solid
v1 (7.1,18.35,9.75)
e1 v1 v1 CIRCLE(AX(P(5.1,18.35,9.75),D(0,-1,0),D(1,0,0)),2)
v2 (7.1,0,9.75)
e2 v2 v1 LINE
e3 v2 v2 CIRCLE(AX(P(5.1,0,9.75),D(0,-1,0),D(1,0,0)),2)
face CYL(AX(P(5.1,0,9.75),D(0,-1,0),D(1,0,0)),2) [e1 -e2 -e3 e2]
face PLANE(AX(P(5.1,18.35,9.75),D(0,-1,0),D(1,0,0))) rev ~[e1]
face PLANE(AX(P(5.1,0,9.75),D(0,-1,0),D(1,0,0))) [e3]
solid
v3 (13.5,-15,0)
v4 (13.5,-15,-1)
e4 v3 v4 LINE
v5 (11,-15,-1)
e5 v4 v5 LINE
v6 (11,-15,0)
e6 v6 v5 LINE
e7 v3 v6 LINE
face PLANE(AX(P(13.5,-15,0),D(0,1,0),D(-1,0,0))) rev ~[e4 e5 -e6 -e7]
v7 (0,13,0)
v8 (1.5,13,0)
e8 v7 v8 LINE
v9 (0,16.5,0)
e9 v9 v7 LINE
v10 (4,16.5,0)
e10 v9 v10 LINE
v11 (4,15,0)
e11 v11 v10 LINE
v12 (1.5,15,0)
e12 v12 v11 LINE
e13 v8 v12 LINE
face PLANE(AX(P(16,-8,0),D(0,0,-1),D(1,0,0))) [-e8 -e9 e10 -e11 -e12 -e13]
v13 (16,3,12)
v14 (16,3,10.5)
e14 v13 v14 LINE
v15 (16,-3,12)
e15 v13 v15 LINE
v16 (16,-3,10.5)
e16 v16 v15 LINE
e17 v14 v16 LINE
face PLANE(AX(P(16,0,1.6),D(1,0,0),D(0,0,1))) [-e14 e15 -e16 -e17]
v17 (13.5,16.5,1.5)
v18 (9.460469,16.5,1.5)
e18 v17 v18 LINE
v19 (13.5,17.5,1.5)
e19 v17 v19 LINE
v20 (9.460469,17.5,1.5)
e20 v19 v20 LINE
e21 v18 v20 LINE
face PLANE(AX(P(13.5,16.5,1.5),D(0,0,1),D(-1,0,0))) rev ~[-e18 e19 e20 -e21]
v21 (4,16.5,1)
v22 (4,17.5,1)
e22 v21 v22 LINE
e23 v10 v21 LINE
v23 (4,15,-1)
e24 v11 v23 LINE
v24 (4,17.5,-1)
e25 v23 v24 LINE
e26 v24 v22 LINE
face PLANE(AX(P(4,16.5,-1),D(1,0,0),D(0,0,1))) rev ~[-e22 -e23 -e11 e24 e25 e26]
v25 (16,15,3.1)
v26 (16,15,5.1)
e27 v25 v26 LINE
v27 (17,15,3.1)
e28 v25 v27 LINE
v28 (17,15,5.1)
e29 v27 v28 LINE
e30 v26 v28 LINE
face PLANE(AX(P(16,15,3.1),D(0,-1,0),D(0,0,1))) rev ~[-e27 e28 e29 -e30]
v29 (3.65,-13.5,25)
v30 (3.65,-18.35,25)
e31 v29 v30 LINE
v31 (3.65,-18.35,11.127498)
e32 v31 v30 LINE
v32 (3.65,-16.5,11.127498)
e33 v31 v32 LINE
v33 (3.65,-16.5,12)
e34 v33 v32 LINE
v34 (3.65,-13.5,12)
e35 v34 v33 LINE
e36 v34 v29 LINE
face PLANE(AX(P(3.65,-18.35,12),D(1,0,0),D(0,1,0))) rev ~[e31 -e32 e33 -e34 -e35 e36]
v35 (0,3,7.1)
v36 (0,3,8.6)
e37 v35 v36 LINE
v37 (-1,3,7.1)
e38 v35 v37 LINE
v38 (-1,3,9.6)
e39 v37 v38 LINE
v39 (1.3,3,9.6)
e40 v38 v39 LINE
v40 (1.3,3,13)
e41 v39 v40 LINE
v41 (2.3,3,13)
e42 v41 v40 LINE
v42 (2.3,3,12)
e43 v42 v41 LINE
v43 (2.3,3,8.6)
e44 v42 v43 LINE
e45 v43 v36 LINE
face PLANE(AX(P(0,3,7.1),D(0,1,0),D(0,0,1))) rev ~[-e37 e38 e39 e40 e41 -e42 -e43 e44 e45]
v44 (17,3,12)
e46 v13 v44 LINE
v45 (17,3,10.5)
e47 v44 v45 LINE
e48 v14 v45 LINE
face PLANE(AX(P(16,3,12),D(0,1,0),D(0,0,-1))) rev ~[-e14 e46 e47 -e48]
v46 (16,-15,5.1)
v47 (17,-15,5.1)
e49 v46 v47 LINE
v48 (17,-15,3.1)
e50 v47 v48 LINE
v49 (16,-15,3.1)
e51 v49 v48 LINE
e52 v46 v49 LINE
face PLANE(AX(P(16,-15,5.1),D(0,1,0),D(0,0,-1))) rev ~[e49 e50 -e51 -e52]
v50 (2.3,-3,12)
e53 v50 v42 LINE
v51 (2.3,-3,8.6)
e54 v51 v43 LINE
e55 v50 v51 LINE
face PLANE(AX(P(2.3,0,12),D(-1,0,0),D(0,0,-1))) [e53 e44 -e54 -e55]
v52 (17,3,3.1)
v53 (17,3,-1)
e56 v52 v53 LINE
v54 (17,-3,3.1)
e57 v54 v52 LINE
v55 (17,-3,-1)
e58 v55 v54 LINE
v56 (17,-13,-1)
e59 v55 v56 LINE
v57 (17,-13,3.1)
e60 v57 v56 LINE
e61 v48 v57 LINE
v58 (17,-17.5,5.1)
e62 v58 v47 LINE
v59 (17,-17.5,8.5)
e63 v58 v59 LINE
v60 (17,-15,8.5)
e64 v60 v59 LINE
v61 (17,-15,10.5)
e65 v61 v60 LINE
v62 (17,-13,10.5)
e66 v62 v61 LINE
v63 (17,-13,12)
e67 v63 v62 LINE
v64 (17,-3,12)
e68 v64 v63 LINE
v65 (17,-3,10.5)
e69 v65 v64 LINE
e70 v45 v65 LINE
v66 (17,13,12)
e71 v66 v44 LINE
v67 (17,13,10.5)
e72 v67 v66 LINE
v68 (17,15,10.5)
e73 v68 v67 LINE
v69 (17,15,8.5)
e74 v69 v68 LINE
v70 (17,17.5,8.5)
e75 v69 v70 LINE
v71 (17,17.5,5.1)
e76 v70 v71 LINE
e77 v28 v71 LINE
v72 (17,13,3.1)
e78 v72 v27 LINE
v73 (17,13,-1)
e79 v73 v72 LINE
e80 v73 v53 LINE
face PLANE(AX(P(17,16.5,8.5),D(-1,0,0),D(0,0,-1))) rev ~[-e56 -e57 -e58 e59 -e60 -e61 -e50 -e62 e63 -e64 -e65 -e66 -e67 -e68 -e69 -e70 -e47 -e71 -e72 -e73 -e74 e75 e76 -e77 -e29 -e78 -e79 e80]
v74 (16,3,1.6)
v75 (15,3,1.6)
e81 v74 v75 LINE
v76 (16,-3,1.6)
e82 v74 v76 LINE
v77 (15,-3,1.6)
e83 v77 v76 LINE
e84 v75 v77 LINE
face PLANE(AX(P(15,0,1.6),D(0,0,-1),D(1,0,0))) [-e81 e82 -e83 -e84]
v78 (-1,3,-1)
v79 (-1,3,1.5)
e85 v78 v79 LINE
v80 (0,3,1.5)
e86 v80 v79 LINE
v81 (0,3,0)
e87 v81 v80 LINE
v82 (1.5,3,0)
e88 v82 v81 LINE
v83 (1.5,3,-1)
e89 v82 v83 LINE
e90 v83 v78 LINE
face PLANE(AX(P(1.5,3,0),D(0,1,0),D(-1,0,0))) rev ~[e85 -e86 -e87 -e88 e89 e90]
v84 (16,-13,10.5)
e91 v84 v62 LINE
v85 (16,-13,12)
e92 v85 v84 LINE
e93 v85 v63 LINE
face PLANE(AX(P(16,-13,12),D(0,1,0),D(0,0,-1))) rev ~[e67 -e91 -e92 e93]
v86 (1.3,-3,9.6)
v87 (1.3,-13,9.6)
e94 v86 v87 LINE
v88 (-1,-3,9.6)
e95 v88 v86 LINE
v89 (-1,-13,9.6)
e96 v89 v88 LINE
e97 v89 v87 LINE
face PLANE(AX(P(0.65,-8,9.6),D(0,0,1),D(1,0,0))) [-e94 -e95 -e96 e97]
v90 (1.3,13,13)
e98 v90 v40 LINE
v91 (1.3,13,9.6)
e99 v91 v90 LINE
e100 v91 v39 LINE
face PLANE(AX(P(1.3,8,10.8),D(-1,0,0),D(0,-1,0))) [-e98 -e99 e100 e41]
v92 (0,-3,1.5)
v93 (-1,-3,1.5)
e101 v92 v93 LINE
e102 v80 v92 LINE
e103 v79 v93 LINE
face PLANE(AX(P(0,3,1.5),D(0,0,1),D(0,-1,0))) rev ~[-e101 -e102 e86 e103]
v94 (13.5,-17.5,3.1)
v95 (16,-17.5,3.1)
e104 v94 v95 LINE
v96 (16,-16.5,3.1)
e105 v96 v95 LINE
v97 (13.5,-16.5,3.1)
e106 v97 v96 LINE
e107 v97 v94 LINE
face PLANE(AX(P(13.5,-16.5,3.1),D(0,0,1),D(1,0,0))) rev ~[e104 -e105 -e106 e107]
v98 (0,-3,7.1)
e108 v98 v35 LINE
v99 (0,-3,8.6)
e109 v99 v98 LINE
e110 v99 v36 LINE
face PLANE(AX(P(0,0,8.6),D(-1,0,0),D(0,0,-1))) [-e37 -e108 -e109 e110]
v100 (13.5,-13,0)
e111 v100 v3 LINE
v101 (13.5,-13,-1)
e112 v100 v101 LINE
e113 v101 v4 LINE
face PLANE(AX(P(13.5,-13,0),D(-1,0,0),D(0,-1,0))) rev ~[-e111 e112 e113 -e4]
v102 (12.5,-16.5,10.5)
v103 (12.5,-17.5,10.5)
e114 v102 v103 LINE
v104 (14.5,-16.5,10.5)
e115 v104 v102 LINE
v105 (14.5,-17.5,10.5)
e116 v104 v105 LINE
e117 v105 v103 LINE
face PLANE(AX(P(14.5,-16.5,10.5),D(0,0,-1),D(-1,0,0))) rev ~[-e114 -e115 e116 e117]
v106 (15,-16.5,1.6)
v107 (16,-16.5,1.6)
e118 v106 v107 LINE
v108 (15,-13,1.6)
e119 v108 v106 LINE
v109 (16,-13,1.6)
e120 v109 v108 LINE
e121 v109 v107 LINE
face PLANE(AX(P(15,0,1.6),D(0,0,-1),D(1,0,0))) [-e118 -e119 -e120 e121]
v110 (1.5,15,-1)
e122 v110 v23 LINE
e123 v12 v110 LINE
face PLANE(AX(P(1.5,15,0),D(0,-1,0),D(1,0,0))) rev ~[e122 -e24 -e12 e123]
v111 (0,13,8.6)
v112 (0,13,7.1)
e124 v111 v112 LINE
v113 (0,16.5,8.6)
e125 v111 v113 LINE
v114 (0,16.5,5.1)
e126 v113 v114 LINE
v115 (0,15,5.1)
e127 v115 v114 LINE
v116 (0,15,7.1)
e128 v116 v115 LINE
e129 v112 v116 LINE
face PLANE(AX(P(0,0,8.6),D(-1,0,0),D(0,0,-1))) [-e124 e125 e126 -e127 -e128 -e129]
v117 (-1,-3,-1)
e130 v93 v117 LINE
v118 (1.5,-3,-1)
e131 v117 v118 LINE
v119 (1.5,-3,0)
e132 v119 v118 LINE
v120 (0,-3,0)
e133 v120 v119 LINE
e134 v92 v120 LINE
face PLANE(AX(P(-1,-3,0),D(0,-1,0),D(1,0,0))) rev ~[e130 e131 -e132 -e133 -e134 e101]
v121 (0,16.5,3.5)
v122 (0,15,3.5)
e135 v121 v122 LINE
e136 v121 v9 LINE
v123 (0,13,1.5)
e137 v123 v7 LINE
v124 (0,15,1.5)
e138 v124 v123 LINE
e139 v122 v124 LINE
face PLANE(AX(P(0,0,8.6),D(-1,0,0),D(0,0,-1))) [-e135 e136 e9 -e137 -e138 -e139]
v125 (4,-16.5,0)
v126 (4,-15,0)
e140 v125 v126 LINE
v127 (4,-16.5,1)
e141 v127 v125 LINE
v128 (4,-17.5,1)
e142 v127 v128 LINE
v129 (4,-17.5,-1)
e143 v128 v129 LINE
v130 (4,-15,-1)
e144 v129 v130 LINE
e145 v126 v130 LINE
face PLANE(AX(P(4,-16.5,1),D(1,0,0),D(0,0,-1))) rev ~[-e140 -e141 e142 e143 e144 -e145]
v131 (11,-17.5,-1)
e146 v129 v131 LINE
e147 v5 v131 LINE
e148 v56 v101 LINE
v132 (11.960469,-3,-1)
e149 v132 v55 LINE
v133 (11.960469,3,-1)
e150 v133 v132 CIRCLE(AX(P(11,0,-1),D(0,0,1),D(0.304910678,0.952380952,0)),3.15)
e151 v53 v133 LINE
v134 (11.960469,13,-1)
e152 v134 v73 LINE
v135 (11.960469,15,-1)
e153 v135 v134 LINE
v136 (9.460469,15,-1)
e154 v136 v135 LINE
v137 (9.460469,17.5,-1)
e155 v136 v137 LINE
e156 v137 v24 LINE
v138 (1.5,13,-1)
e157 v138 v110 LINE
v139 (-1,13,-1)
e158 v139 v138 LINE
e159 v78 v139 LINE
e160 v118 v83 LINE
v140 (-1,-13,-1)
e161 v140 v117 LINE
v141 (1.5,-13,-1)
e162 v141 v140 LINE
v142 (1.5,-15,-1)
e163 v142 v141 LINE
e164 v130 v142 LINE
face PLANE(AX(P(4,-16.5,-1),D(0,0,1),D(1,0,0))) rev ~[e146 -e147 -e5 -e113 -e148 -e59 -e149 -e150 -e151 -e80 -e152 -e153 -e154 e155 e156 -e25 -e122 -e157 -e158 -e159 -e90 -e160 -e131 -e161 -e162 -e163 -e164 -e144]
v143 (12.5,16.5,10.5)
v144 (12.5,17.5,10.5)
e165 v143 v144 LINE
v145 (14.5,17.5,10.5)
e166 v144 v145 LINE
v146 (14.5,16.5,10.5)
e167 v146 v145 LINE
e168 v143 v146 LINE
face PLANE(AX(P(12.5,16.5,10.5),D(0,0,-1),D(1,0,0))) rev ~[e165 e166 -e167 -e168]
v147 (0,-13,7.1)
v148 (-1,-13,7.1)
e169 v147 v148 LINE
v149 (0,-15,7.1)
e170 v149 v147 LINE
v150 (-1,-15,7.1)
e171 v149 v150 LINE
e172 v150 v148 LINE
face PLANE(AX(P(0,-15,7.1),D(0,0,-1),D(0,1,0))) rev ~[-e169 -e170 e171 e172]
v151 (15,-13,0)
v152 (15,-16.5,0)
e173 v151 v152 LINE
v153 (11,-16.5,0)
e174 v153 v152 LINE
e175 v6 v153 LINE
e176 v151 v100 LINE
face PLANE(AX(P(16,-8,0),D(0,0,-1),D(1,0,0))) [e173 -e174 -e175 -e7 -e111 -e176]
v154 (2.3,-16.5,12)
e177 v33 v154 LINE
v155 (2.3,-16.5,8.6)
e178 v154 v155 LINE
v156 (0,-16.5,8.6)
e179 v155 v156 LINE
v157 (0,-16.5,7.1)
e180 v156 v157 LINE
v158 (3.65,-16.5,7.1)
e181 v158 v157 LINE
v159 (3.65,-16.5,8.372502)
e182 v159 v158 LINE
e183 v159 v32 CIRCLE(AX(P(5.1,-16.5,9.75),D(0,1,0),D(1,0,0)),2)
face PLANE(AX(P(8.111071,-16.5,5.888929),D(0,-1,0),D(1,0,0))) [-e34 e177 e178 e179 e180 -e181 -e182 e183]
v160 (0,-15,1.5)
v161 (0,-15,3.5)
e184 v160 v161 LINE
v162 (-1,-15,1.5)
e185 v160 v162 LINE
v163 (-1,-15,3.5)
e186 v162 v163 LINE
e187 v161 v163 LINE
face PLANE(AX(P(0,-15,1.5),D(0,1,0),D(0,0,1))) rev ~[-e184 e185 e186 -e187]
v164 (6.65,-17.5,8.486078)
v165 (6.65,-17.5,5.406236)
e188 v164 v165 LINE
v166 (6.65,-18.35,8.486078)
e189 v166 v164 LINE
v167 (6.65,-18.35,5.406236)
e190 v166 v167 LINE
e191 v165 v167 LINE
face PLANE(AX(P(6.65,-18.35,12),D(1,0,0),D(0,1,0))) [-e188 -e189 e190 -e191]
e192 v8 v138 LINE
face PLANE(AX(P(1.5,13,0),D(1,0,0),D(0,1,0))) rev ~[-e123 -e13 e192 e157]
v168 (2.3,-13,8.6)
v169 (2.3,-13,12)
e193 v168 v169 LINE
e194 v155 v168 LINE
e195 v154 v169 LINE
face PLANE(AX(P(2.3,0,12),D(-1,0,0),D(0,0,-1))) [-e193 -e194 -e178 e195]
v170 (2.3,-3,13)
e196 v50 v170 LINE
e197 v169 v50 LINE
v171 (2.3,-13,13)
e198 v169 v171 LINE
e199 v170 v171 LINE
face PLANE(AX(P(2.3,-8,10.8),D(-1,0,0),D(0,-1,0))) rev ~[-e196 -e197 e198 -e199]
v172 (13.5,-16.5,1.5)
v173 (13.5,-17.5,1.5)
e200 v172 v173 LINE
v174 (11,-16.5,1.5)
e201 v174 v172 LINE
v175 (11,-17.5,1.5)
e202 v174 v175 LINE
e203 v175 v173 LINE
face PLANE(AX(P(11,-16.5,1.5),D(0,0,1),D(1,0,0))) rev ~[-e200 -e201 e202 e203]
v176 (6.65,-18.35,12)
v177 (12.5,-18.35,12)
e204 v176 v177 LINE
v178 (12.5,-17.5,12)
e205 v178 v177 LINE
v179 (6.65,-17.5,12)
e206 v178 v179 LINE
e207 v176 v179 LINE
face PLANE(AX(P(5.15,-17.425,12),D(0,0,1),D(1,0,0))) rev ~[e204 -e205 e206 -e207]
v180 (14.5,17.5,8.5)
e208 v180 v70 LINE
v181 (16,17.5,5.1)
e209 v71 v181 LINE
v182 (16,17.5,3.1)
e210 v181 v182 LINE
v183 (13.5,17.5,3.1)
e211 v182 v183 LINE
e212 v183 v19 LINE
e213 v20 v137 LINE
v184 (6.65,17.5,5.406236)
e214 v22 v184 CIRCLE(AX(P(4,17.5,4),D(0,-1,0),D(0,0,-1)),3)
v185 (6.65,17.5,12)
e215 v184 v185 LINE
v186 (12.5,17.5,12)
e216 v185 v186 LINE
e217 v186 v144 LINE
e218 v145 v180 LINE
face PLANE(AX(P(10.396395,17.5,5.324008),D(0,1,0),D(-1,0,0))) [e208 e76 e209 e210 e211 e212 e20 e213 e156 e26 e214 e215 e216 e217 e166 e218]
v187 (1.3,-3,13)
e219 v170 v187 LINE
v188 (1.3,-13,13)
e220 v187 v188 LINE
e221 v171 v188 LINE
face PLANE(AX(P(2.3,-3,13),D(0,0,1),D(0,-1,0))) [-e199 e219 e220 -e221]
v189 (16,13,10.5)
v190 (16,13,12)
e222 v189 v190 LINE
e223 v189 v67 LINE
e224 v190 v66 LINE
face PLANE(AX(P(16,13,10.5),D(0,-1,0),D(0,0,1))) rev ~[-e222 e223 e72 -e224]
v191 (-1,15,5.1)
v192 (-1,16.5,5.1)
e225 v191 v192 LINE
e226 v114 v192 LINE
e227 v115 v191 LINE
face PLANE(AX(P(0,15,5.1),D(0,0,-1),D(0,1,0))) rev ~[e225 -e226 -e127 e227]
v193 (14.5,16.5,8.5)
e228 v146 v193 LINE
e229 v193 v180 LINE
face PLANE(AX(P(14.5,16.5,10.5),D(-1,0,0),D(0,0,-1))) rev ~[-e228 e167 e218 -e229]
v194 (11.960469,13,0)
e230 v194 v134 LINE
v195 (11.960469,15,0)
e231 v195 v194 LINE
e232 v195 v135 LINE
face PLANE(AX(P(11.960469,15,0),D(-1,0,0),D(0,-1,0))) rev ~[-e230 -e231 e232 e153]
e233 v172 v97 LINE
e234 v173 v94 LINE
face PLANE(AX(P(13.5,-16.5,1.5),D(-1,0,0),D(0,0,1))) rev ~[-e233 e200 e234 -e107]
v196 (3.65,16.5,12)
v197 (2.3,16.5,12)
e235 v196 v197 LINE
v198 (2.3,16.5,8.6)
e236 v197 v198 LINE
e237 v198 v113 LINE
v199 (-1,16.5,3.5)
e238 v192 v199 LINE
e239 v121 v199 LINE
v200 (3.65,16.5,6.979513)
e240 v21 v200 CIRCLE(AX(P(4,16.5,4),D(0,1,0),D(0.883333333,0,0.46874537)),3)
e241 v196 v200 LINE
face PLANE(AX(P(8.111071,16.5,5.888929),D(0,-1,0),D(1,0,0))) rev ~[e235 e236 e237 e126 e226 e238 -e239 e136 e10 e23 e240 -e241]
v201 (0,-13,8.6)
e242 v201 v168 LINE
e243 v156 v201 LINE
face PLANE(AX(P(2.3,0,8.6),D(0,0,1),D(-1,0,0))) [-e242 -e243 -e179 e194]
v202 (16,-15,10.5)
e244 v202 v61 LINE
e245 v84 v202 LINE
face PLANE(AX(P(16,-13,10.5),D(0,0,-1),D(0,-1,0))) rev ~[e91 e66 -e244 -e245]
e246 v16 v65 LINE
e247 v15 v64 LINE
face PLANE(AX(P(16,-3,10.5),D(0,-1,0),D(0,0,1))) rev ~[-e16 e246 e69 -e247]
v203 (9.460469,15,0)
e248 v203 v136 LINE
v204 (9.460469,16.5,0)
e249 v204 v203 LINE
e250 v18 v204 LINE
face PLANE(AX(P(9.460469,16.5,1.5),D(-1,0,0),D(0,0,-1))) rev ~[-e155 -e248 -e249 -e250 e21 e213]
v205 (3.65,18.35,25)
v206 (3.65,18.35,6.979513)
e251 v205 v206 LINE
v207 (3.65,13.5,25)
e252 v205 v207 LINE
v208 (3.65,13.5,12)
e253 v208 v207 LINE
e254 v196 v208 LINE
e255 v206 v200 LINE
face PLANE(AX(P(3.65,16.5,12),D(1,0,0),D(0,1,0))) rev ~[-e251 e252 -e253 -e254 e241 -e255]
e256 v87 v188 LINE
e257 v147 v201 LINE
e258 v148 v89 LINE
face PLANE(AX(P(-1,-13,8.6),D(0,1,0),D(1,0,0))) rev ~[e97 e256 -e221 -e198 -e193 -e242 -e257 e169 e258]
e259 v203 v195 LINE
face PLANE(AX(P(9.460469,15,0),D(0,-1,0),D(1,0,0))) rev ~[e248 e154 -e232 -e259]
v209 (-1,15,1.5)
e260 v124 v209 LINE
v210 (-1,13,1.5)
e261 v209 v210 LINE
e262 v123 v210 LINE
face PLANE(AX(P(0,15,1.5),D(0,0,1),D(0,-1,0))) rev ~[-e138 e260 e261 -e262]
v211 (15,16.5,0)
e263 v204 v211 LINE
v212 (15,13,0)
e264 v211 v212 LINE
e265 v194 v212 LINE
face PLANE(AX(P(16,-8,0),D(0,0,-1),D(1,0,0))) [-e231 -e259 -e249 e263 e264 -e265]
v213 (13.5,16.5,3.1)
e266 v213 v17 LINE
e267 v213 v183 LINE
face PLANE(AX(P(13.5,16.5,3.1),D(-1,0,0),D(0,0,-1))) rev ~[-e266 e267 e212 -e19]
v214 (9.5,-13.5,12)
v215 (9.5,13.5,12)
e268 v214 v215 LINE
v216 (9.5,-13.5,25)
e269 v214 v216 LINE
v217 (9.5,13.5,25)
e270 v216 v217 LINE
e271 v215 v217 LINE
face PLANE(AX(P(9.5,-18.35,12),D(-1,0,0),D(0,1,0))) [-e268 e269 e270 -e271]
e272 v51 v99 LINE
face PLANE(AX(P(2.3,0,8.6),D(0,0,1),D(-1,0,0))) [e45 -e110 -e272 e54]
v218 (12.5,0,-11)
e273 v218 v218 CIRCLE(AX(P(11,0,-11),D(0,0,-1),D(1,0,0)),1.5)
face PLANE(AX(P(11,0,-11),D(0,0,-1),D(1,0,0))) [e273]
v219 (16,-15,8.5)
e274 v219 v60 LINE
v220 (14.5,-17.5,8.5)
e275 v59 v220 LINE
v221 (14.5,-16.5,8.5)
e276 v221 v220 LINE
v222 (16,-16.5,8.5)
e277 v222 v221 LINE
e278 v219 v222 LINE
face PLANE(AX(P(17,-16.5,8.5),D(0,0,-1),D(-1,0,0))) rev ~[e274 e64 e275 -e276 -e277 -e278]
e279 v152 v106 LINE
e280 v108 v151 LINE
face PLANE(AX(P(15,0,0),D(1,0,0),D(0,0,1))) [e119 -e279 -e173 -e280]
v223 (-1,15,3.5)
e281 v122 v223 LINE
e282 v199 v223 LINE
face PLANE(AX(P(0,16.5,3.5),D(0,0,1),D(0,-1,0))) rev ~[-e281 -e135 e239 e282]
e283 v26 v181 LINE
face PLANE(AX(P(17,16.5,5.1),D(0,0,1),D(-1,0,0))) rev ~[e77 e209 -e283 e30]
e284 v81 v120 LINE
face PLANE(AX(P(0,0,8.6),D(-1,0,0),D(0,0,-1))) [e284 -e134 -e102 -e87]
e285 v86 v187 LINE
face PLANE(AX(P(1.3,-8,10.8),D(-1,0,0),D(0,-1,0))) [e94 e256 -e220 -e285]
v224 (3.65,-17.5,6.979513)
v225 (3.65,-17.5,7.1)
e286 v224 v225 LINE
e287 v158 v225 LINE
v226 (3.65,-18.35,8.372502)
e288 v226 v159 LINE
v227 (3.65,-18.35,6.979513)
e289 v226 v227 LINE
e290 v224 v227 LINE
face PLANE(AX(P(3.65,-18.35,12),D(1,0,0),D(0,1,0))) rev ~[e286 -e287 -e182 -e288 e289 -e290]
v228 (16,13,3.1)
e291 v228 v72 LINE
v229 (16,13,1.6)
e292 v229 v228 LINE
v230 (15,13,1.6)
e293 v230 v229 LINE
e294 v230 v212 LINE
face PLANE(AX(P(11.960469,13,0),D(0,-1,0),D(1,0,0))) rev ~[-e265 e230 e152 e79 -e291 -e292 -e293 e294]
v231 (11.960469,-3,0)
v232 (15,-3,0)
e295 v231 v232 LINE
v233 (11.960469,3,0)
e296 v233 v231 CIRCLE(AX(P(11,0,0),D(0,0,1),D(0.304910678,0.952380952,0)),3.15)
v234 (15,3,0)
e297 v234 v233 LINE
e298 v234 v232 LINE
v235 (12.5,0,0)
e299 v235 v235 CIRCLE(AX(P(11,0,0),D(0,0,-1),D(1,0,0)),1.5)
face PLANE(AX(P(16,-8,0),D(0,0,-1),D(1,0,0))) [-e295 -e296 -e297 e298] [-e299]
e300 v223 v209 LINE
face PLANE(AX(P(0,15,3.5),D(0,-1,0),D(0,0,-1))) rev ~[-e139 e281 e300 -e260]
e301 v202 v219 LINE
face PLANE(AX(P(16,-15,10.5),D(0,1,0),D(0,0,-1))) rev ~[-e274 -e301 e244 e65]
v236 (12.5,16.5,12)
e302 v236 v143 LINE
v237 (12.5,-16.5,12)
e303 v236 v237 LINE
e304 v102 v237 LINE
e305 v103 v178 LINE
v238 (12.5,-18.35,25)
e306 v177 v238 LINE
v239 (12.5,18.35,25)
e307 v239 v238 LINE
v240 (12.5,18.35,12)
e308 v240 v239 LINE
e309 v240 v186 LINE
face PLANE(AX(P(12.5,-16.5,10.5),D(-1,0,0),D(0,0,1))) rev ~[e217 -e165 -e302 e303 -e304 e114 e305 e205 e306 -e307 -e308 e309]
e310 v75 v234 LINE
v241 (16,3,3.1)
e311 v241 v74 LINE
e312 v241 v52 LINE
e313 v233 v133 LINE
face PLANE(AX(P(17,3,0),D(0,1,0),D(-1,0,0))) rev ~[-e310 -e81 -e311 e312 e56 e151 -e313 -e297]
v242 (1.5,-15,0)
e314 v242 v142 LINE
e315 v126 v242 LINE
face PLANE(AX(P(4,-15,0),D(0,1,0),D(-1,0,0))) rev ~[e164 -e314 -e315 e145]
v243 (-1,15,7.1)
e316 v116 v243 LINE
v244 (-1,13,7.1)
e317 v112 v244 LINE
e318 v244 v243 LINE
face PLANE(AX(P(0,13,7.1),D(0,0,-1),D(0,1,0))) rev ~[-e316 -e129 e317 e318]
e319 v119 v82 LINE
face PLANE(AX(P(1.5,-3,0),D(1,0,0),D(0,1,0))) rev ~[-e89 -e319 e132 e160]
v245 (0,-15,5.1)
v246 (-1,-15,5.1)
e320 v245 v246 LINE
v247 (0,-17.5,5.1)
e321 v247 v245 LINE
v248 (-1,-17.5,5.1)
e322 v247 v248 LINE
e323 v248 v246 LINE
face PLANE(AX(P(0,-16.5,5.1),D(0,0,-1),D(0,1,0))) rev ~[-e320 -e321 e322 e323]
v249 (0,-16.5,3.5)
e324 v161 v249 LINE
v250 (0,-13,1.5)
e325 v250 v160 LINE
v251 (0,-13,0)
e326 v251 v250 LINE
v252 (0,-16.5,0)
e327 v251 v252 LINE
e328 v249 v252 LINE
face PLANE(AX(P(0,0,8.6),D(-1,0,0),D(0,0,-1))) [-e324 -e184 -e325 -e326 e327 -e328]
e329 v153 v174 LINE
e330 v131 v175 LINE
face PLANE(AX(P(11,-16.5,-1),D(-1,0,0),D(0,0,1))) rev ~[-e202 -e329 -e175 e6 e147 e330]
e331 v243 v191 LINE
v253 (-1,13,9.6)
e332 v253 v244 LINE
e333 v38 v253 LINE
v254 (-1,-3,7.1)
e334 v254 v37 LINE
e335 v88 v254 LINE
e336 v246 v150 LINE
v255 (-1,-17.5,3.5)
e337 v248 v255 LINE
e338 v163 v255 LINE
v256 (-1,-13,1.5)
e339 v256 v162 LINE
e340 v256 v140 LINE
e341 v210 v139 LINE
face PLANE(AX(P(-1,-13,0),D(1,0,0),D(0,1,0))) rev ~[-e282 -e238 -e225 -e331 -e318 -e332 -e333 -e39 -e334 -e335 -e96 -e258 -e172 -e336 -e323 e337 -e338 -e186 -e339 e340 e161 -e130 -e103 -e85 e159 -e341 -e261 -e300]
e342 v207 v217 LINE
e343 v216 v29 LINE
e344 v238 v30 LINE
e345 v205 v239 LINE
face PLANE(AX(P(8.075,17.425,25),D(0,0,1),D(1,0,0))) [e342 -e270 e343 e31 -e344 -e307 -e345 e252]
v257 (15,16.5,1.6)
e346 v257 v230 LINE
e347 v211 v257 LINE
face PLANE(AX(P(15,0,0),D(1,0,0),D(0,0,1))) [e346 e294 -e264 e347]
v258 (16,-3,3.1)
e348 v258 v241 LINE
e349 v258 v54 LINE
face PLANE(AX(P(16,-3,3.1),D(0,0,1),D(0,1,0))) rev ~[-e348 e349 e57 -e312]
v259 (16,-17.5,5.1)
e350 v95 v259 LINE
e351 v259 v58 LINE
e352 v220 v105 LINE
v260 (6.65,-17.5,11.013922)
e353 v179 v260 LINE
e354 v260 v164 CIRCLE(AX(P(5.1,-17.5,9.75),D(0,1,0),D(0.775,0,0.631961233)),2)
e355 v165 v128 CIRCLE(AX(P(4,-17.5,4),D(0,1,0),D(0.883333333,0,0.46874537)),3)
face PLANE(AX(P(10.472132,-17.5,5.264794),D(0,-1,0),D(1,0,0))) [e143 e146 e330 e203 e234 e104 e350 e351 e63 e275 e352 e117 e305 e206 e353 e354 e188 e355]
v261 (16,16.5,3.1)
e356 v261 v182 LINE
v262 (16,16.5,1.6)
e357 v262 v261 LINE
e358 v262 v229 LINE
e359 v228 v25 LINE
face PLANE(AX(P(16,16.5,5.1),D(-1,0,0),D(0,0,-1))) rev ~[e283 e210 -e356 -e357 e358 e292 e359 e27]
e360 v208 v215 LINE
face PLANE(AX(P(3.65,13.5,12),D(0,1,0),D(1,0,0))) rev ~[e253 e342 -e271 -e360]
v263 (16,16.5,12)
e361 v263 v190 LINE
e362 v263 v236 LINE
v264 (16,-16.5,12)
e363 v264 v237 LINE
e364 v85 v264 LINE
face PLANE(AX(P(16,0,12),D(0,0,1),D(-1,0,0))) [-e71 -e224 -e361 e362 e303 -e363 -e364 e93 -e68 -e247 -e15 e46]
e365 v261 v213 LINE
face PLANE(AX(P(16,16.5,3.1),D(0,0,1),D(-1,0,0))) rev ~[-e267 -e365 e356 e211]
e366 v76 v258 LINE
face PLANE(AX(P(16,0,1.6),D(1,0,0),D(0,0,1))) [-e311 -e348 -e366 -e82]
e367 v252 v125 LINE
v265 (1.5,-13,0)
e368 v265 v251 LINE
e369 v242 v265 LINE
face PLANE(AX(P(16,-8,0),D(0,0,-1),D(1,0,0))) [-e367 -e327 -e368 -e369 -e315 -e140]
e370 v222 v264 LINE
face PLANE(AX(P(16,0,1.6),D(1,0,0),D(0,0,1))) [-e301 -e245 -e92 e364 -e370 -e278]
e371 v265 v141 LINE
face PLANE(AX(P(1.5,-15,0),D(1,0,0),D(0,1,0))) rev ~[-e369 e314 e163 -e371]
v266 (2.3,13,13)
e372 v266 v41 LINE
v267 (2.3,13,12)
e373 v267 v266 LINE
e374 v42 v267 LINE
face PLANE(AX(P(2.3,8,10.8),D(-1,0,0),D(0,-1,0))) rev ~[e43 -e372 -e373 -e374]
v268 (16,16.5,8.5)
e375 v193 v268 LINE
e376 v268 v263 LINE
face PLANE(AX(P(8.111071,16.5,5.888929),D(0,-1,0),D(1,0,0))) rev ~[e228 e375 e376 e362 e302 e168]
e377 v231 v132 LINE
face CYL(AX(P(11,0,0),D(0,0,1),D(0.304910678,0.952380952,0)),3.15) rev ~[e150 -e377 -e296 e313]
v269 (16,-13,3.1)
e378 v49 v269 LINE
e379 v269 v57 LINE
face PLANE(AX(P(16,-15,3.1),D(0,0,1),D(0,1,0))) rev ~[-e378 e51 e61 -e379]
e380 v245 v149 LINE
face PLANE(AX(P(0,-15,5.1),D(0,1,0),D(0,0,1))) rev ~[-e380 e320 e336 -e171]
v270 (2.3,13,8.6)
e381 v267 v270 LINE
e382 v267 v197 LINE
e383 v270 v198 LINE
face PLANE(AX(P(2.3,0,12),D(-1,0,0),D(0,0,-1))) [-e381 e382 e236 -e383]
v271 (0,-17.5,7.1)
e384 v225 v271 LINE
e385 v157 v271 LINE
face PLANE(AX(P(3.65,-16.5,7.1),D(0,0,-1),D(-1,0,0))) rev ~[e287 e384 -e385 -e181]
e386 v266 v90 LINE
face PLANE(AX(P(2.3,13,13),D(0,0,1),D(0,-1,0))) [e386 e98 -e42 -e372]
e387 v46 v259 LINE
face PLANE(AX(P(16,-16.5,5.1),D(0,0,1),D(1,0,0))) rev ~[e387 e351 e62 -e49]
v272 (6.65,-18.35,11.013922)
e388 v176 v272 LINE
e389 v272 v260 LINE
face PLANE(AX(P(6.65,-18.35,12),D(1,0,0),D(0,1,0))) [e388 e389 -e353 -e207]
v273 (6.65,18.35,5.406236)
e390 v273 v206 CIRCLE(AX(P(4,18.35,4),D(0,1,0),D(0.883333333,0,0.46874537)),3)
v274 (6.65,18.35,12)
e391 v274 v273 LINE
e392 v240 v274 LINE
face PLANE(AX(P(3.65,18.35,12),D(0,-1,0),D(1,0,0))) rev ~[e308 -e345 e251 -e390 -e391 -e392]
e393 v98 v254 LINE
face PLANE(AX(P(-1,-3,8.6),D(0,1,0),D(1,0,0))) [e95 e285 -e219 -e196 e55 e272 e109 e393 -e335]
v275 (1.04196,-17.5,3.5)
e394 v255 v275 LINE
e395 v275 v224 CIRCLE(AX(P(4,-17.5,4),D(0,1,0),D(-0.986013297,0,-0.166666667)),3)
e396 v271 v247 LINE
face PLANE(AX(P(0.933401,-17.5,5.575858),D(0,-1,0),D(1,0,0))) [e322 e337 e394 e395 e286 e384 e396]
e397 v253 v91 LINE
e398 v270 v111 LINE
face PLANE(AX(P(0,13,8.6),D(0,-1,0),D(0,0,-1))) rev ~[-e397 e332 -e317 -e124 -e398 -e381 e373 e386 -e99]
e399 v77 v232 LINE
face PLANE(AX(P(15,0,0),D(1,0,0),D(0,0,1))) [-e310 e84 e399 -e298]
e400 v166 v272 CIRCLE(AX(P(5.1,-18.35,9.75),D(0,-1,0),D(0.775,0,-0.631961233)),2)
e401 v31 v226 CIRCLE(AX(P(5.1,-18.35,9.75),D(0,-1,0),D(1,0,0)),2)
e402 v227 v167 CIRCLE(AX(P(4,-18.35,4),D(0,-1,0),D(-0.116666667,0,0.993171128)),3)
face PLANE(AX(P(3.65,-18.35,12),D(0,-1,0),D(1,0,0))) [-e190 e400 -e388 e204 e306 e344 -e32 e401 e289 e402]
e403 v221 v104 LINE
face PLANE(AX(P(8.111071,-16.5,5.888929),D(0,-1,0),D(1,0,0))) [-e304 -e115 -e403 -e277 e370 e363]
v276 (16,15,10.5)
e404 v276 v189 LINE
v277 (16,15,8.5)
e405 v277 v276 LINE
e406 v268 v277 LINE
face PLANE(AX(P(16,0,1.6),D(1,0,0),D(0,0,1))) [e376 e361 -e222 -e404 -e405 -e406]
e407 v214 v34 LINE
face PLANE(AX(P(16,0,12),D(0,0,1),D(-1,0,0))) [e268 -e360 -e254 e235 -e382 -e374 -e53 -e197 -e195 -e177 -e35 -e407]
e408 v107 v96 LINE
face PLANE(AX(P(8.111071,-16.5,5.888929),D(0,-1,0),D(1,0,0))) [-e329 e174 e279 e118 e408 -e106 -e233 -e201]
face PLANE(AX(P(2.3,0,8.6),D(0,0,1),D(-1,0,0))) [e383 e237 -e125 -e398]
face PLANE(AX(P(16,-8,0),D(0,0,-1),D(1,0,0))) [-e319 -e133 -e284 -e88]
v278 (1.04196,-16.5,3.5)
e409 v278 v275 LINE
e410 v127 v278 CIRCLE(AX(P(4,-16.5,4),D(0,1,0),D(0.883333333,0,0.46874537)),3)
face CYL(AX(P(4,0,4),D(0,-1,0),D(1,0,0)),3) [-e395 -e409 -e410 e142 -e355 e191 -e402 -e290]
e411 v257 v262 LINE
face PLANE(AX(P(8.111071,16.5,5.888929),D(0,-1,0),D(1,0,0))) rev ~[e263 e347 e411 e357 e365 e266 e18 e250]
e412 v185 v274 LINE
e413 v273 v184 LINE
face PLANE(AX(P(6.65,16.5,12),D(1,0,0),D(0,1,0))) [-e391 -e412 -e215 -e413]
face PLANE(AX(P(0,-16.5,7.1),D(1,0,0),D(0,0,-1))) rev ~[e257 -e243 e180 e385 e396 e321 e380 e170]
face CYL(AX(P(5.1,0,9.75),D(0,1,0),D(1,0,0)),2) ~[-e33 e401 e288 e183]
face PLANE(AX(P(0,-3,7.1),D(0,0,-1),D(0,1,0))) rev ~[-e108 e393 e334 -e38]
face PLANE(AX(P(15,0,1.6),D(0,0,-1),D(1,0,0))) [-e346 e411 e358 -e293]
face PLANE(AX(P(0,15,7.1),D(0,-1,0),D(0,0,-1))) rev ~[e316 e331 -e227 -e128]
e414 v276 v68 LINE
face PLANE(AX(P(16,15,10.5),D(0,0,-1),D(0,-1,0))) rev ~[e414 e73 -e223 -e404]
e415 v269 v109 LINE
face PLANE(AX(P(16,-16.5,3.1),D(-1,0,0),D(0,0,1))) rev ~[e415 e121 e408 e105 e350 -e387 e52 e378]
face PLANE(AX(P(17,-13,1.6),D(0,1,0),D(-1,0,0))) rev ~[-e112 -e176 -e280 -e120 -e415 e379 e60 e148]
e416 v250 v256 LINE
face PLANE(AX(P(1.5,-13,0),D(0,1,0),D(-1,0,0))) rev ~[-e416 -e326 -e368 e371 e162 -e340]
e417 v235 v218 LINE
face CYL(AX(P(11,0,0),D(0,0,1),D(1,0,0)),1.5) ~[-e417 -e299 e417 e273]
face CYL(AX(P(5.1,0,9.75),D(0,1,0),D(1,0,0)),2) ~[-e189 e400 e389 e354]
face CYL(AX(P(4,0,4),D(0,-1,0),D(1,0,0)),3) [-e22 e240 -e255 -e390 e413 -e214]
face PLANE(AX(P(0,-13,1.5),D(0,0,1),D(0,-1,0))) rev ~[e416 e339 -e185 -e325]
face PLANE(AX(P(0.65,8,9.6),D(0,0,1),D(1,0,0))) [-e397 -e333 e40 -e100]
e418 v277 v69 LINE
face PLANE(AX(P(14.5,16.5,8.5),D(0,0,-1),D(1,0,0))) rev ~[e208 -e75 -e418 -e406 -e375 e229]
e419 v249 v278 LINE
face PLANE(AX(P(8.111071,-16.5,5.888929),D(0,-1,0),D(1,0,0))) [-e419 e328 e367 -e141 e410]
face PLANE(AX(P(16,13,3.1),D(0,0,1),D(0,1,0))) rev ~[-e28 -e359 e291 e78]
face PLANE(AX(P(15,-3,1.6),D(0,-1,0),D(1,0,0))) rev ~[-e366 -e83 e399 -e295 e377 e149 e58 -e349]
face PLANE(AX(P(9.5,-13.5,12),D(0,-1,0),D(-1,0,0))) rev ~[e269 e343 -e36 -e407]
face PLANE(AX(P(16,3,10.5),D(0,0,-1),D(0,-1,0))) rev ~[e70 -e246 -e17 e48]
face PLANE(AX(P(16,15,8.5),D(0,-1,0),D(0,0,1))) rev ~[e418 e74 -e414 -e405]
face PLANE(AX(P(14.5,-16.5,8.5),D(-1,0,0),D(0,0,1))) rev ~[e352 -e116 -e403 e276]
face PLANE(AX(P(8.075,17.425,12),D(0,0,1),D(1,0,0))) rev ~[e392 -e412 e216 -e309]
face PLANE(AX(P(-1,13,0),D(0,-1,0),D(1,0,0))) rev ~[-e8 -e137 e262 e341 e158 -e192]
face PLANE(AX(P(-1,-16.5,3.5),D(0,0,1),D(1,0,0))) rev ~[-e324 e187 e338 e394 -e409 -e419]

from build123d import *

# Parameters (mm, degrees)
F0_R          = 3
F0_R_2        = 2
F1_DEPTH      = 16.5
F1_DEPTH_BACK = 16.5
F3_DEPTH      = 18.35
F4_DEPTH      = 11
F5_DEPTH      = 18.35
F6_DEPTH      = 18.35
F7_START      = -12
F2_W          = 3
F2_H          = 1.85
F7_DEPTH      = 13
F9_DEPTH      = 1
F11_DEPTH     = 1
F12_W         = 3
F12_H         = 1.85
F12_W_2       = 2.85
F12_W_3       = 4.2
F12_H_2       = 1.5
F13_DEPTH     = 13
F14_DEPTH     = 13
F15_DEPTH     = 8
F16_DEPTH     = 8
F17_W         = 3.3
F17_H         = 10
F18_DEPTH     = 1
F19_W         = 10
F19_H         = 4.4
F20_DEPTH     = 1
F22_DEPTH     = 1.6
F24_DEPTH     = 1
F26_DEPTH     = 1
F28_DEPTH     = 1


with BuildPart() as f1:
    # F0 (on Front) → F1 (new body, two sides)
    with BuildSketch(Plane.XZ) as f1_sk:
        Polygon((0, 8.6), (0, 0), (15, 0), (15, 1.6), (16, 1.6), (16, 12), (2.3, 12), (2.3, 8.6), align=None)
        with Locations((4, 4)):
            Circle(F0_R, mode=Mode.SUBTRACT)
        with Locations((5.1, 9.75)):
            Circle(F0_R_2, mode=Mode.SUBTRACT)
        with Locations((4, 4)):
            Circle(F0_R)
        with Locations((5.1, 9.75)):
            Circle(F0_R_2)
    extrude(amount=F1_DEPTH)
    extrude(f1_sk.sketch, amount=-F1_DEPTH_BACK)

    # F0 (on Front) → F3 (join, symmetric)
    with BuildSketch(Plane.XZ):
        with Locations((4, 4)):
            Circle(F0_R)
    extrude(amount=F3_DEPTH, both=True)

    # F2 (on face) → F4 (join)
    with BuildSketch(Plane(origin=(0, 0, 0), x_dir=(1, 0, 0), z_dir=(0, 0, -1))):
        with BuildLine():
            ThreePointArc((9.5, 0), (11, -1.5), (12.5, 0))
            ThreePointArc((12.5, 0), (11, 1.5), (9.5, 0))
        make_face()
    extrude(amount=F4_DEPTH)

    # F0 (on Front) → F5 (join)
    with BuildSketch(Plane.XZ):
        with Locations((5.1, 9.75)):
            Circle(F0_R_2)
    extrude(amount=F5_DEPTH)

    # F2 (on face) → F7 (join)
    with BuildSketch(Plane(origin=(0, 0, 0), x_dir=(1, 0, 0), z_dir=(0, 0, -1)).offset(F7_START)):
        with Locations((11, 17.425)):
            Rectangle(F2_W, F2_H)
        with BuildLine():
            ThreePointArc((9.5, 2), (11, 2.5), (12.5, 2))
            Line((12.5, 2), (12.5, 16.5))
            Line((12.5, 16.5), (9.5, 16.5))
            Line((9.5, 16.5), (9.5, 2))
        make_face()
        with BuildLine():
            Line((12.5, 0), (12.5, 2))
            ThreePointArc((12.5, 2), (11, 2.5), (9.5, 2))
            Line((9.5, 2), (9.5, 0))
            ThreePointArc((9.5, 0), (11, 1.5), (12.5, 0))
        make_face()
        with BuildLine():
            ThreePointArc((9.5, 0), (11, -1.5), (12.5, 0))
            ThreePointArc((12.5, 0), (11, 1.5), (9.5, 0))
        make_face()
        with BuildLine():
            ThreePointArc((9.5, -2), (11, -2.5), (12.5, -2))
            Line((12.5, -2), (12.5, 0))
            ThreePointArc((12.5, 0), (11, -1.5), (9.5, 0))
            Line((9.5, 0), (9.5, -2))
        make_face()
        with BuildLine():
            Line((12.5, -16.5), (12.5, -2))
            ThreePointArc((12.5, -2), (11, -2.5), (9.5, -2))
            Line((9.5, -2), (9.5, -16.5))
            Line((9.5, -16.5), (12.5, -16.5))
        make_face()
        with Locations((11, -17.425)):
            Rectangle(F2_W, F2_H)
    extrude(amount=-F7_DEPTH)

    # F8 (on face) → F9 (join)
    with BuildSketch(Plane.YZ.offset(16)):
        Polygon((-13, 3.1), (-13, 1.6), (-3, 1.6), (-3, 3.1), (3, 3.1), (3, 1.6), (13, 1.6), (13, 3.1), (15, 3.1), (15, 5.1), (16.5, 5.1), (16.5, 8.5), (15, 8.5), (15, 10.5), (13, 10.5), (13, 12), (3, 12), (3, 10.5), (-3, 10.5), (-3, 12), (-13, 12), (-13, 10.5), (-15, 10.5), (-15, 8.5), (-16.5, 8.5), (-16.5, 5.1), (-15, 5.1), (-15, 3.1), align=None)
    extrude(amount=F9_DEPTH)

    # F10 (on face) → F11 (join)
    with BuildSketch(Plane(origin=(0, 0, 0), x_dir=(0, -1, 0), z_dir=(-1, 0, 0))):
        Polygon((-13, 1.5), (-13, 0), (-3, 0), (-3, 1.5), (3, 1.5), (3, 0), (13, 0), (13, 1.5), (15, 1.5), (15, 3.5), (16.5, 3.5), (16.5, 5.1), (15, 5.1), (15, 7.1), (13, 7.1), (13, 8.6), (3, 8.6), (3, 7.1), (-3, 7.1), (-3, 8.6), (-13, 8.6), (-13, 7.1), (-15, 7.1), (-15, 5.1), (-16.5, 5.1), (-16.5, 3.5), (-15, 3.5), (-15, 1.5), align=None)
    extrude(amount=F11_DEPTH)

    # F12 (on face) → F13 (join, through all)
    with BuildSketch(Plane.XY.offset(12)):
        with Locations((5.15, -17.425)):
            Rectangle(F12_W, F12_H)
        Polygon((6.65, -16.5), (9.5, -16.5), (9.5, -13.5), (8, -13.5), (8, -15), (3.8, -15), (3.8, -13.5), (3.65, -13.5), (3.65, -16.5), align=None)
        with Locations((8.075, -17.425)):
            Rectangle(F12_W_2, F12_H)
        with Locations((5.9, -14.25)):
            Rectangle(F12_W_3, F12_H_2)
    extrude(amount=F13_DEPTH)

    # F12 (on face) → F14 (join, through all)
    with BuildSketch(Plane.XY.offset(12)):
        with Locations((8.075, 17.425)):
            Rectangle(F12_W_2, F12_H)
        with Locations((5.15, 17.425)):
            Rectangle(F12_W, F12_H)
        Polygon((8, 13.5), (9.5, 13.5), (9.5, 16.5), (6.65, 16.5), (3.65, 16.5), (3.65, 13.5), (3.8, 13.5), (3.8, 15), (8, 15), align=None)
        with Locations((5.9, 14.25)):
            Rectangle(F12_W_3, F12_H_2)
    extrude(amount=F14_DEPTH)

    # F12 (on face) → F15 (join)
    with BuildSketch(Plane.XY.offset(12)):
        with Locations((5.15, -17.425)):
            Rectangle(F12_W, F12_H)
    extrude(amount=-F15_DEPTH)

    # F12 (on face) → F16 (join)
    with BuildSketch(Plane.XY.offset(12)):
        with Locations((5.15, 17.425)):
            Rectangle(F12_W, F12_H)
    extrude(amount=-F16_DEPTH)

    # F17 (on face) → F18 (join)
    with BuildSketch(Plane.XY.offset(8.6)):
        with Locations((0.65, -8)):
            Rectangle(F17_W, F17_H)
        with Locations((0.65, 8)):
            Rectangle(F17_W, F17_H)
    extrude(amount=F18_DEPTH)

    # F19 (on face) → F20 (join)
    with BuildSketch(Plane(origin=(2.3, 0, 0), x_dir=(0, -1, 0), z_dir=(-1, 0, 0))):
        with Locations((8, 10.8)):
            Rectangle(F19_W, F19_H)
        with Locations((-8, 10.8)):
            Rectangle(F19_W, F19_H)
    extrude(amount=F20_DEPTH)

    # F21 (on face) → F22 (join, through all)
    with BuildSketch(Plane(origin=(0, 0, 1.6), x_dir=(1, 0, 0), z_dir=(0, 0, -1))):
        Polygon((16, 13), (15, 13), (15, 3), (16, 3), (17, 3), (17, 13), align=None)
        Polygon((16, -3), (15, -3), (15, -13), (16, -13), (17, -13), (17, -3), align=None)
    extrude(amount=F22_DEPTH)

    # F23 (on face) → F24 (join)
    with BuildSketch(Plane(origin=(0, 0, 0), x_dir=(1, 0, 0), z_dir=(0, 0, -1))):
        with BuildLine():
            Line((15, -13), (17, -13))
            Line((17, -13), (17, -3))
            Line((17, -3), (15, -3))
            Line((15, -3), (11.9604686356, -3))
            ThreePointArc((11.9604686356, -3), (7.85, 0), (11.9604686356, 3))
            Line((11.9604686356, 3), (15, 3))
            Line((15, 3), (17, 3))
            Line((17, 3), (17, 13))
            Line((17, 13), (15, 13))
            Line((15, 13), (13.5, 13))
            Line((13.5, 13), (13.5, 15))
            Line((13.5, 15), (11, 15))
            Line((11, 15), (11, 16.5))
            Line((11, 16.5), (4, 16.5))
            Line((4, 16.5), (4, 15))
            Line((4, 15), (1.5, 15))
            Line((1.5, 15), (1.5, 13))
            Line((1.5, 13), (0, 13))
            Line((0, 13), (-1, 13))
            Line((-1, 13), (-1, 3))
            Line((-1, 3), (0, 3))
            Line((0, 3), (1.5, 3))
            Line((1.5, 3), (1.5, -3))
            Line((1.5, -3), (0, -3))
            Line((0, -3), (-1, -3))
            Line((-1, -3), (-1, -13))
            Line((-1, -13), (0, -13))
            Line((0, -13), (1.5, -13))
            Line((1.5, -13), (1.5, -15))
            Line((1.5, -15), (4, -15))
            Line((4, -15), (4, -16.5))
            Line((4, -16.5), (9.4604686356, -16.5))
            Line((9.4604686356, -16.5), (9.4604686356, -15))
            Line((9.4604686356, -15), (11.9604686356, -15))
            Line((11.9604686356, -15), (11.9604686356, -13))
            Line((11.9604686356, -13), (15, -13))
        make_face()
    extrude(amount=F24_DEPTH)

    # F25 (on face) → F26 (join)
    with BuildSketch(Plane(origin=(0, 16.5, 0), x_dir=(-1, 0, 0), z_dir=(0, 1, 0))):
        with BuildLine():
            Line((-12.5, 10.5), (-14.5, 10.5))
            Line((-14.5, 10.5), (-14.5, 8.5))
            Line((-14.5, 8.5), (-16, 8.5))
            Line((-16, 8.5), (-17, 8.5))
            Line((-17, 8.5), (-17, 5.1))
            Line((-17, 5.1), (-16, 5.1))
            Line((-16, 5.1), (-16, 3.1))
            Line((-16, 3.1), (-13.5, 3.1))
            Line((-13.5, 3.1), (-13.5, 1.5))
            Line((-13.5, 1.5), (-9.4604686356, 1.5))
            Line((-9.4604686356, 1.5), (-9.4604686356, 0))
            Line((-9.4604686356, 0), (-9.4604686356, -1))
            Line((-9.4604686356, -1), (-4, -1))
            Line((-4, -1), (-4, 0))
            Line((-4, 0), (-4, 1))
            ThreePointArc((-4, 1), (-6.5708664233, 2.4538286533), (-6.65, 5.406236111))
            Line((-6.65, 5.406236111), (-6.65, 12))
            Line((-6.65, 12), (-12.5, 12))
            Line((-12.5, 12), (-12.5, 10.5))
        make_face()
    extrude(amount=F26_DEPTH)

    # F27 (on face) → F28 (join)
    with BuildSketch(Plane.XZ.offset(16.5)):
        with BuildLine():
            Line((4, 0), (4, -1))
            Line((4, -1), (11, -1))
            Line((11, -1), (11, 0))
            Line((11, 0), (11, 1.5))
            Line((11, 1.5), (13.5, 1.5))
            Line((13.5, 1.5), (13.5, 3.1))
            Line((13.5, 3.1), (16, 3.1))
            Line((16, 3.1), (16, 5.1))
            Line((16, 5.1), (17, 5.1))
            Line((17, 5.1), (17, 8.5))
            Line((17, 8.5), (16, 8.5))
            Line((16, 8.5), (14.5, 8.5))
            Line((14.5, 8.5), (14.5, 10.5))
            Line((14.5, 10.5), (12.5, 10.5))
            Line((12.5, 10.5), (12.5, 12))
            Line((12.5, 12), (6.65, 12))
            Line((6.65, 12), (6.65, 11.013922466))
            ThreePointArc((6.65, 11.013922466), (7.1, 9.75), (6.65, 8.486077534))
            Line((6.65, 8.486077534), (6.65, 5.406236111))
            ThreePointArc((6.65, 5.406236111), (6.5708664233, 2.4538286533), (4, 1))
            Line((4, 1), (4, 0))
        make_face()
        with BuildLine():
            Line((-1, 3.5), (0, 3.5))
            Line((0, 3.5), (1.0419601085, 3.5))
            ThreePointArc((1.0419601085, 3.5), (1.599471865, 5.7992956047), (3.65, 6.9795133831))
            Line((3.65, 6.9795133831), (3.65, 7.1))
            Line((3.65, 7.1), (0, 7.1))
            Line((0, 7.1), (0, 5.1))
            Line((0, 5.1), (-1, 5.1))
            Line((-1, 5.1), (-1, 3.5))
        make_face()
    extrude(amount=F28_DEPTH)


with BuildPart() as f6:
    # F0 (on Front) → F6 (new body)
    with BuildSketch(Plane.XZ):
        with Locations((5.1, 9.75)):
            Circle(F0_R_2)
    extrude(amount=-F6_DEPTH)


solid = Compound([f1.part, f6.part])
